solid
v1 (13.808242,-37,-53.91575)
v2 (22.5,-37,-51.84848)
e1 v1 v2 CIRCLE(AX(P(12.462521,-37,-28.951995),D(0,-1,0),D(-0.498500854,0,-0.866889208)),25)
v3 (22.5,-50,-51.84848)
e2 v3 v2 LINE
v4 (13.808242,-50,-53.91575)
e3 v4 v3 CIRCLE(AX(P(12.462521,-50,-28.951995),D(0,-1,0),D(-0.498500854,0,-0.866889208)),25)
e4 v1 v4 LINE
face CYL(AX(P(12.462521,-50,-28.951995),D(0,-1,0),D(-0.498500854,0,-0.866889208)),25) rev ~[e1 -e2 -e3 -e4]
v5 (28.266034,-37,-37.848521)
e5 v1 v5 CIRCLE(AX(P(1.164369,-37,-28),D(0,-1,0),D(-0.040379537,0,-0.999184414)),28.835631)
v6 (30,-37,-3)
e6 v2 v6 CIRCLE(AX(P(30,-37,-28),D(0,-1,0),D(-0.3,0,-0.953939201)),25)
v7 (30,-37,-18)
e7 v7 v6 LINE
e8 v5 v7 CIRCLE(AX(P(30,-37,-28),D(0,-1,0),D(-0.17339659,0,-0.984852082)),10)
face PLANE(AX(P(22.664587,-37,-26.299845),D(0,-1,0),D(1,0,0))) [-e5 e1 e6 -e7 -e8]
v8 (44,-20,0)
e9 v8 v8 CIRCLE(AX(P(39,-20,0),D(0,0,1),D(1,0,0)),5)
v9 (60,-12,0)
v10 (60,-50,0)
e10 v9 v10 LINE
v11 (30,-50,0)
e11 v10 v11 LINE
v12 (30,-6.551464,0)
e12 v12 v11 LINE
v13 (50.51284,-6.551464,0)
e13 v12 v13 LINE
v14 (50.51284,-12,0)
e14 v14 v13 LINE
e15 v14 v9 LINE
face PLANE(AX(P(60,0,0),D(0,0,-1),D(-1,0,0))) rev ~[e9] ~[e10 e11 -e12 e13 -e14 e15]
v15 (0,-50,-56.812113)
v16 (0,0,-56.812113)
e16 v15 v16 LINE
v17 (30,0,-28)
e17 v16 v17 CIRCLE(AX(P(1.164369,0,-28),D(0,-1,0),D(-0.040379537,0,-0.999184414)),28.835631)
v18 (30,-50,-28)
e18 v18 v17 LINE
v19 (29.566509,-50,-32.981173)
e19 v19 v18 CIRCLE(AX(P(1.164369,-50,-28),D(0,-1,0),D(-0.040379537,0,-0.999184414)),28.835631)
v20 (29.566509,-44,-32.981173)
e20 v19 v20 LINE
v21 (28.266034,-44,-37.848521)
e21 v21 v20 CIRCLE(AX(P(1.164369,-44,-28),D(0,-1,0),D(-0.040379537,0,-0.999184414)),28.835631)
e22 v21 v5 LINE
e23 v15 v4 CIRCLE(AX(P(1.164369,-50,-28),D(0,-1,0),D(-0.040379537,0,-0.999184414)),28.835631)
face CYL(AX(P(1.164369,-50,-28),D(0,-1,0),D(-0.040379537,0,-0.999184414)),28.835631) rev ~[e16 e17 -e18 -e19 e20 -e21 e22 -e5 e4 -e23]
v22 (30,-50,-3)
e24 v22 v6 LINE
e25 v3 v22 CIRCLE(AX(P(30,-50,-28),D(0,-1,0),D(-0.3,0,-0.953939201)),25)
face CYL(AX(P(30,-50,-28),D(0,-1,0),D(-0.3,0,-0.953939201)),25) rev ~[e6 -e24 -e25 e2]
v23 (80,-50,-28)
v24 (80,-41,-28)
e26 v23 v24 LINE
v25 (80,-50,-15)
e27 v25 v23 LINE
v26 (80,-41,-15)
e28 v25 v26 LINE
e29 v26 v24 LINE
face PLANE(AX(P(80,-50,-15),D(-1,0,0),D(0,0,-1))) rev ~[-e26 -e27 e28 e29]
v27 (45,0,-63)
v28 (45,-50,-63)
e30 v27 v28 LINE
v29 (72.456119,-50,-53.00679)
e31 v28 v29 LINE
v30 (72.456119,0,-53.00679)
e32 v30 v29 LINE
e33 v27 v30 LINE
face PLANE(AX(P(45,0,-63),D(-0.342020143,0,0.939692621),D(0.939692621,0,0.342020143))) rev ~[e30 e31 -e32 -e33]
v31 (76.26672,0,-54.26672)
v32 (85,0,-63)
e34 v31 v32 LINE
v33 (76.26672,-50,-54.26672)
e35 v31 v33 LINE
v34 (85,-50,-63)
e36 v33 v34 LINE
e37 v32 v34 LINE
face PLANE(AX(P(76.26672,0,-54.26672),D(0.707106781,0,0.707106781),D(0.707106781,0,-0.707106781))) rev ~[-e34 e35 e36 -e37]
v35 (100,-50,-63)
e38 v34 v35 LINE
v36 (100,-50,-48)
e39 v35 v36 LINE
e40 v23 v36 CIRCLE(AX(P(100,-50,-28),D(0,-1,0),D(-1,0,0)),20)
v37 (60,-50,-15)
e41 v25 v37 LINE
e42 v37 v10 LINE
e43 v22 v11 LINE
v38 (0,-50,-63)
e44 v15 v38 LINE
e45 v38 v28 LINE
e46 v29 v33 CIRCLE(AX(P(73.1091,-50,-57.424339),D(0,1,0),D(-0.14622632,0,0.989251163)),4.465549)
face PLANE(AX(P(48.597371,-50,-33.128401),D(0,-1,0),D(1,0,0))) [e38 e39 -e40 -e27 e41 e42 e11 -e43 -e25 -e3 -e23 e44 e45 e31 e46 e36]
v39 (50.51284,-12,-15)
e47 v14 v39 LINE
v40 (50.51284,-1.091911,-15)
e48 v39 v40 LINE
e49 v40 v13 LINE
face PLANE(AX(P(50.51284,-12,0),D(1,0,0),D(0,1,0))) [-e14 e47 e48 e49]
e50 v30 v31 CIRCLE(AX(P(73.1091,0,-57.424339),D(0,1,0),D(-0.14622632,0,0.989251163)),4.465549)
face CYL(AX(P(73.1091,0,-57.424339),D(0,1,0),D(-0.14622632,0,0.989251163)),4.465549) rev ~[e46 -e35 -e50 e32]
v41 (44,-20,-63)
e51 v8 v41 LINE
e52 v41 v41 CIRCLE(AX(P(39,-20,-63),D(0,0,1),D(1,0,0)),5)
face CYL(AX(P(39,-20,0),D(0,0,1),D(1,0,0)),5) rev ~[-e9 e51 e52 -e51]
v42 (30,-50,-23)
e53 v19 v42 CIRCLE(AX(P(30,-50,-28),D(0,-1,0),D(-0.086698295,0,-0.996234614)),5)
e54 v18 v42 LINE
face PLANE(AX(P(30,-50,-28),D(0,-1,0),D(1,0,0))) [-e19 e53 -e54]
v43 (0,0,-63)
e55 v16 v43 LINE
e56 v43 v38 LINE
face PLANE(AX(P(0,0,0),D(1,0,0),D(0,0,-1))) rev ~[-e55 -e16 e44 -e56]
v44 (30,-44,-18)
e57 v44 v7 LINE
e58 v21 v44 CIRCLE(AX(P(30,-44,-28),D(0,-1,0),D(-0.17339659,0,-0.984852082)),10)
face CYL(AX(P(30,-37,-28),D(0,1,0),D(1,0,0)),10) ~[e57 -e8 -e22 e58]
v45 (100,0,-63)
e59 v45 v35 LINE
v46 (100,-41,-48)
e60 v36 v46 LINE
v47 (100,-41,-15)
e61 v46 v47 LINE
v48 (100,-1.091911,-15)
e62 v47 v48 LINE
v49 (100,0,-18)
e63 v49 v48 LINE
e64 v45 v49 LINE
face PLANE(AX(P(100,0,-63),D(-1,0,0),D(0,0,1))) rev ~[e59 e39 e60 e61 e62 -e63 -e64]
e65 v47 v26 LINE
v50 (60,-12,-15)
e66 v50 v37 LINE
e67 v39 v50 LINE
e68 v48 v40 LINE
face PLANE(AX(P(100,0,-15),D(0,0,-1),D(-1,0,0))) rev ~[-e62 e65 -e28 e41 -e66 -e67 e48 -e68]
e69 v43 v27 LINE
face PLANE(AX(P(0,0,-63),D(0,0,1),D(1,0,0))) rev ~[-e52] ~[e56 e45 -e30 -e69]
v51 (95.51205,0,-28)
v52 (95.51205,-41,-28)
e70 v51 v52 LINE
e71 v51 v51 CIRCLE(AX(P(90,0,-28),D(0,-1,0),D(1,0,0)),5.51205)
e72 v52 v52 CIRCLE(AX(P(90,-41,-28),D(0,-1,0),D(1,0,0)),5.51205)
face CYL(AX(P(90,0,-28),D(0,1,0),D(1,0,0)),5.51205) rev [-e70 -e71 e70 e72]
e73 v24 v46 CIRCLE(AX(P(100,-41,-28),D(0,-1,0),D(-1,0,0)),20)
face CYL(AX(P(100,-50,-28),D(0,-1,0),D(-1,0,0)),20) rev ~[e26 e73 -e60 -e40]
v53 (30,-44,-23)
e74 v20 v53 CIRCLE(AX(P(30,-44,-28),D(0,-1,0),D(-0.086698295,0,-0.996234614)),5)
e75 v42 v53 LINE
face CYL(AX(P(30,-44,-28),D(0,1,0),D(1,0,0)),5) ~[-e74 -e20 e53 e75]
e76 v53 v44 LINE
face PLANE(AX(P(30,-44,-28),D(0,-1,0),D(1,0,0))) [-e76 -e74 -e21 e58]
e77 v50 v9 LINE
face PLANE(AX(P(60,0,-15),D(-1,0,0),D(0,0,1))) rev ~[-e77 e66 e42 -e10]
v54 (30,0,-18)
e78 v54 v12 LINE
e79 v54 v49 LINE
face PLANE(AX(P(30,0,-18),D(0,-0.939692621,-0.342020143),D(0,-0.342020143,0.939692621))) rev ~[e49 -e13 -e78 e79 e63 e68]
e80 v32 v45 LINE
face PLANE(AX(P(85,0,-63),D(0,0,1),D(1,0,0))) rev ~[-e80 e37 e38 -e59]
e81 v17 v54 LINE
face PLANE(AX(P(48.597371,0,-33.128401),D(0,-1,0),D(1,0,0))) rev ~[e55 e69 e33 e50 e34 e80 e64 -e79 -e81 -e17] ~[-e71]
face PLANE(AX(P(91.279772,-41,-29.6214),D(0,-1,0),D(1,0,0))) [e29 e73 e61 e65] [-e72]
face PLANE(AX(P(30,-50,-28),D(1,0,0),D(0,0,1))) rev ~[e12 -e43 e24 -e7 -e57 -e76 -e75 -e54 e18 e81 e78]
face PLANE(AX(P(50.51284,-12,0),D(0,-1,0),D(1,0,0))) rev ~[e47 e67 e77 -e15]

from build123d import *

# Parameters (mm, degrees)
F0_R      = 5.5120501068
F1_DEPTH  = 50
F3_DEPTH  = 13
F4_R      = 10
F5_DEPTH  = 7
F6_R      = 5
F7_DEPTH  = 6
F8_R      = 5.5120501068
F9_DEPTH  = 9
F11_DEPTH = 381
F13_DEPTH = 381
F14_W     = 50
F14_H     = 12
F15_DEPTH = 15
F16_R     = 5
F17_DEPTH = 381


with BuildPart() as f1:
    # F0 (on Front) → F1 (new body)
    with BuildSketch(Plane.XZ):
        with BuildLine():
            Line((60, -15), (60, 0))
            Line((60, 0), (0, 0))
            Line((0, 0), (0, -63))
            Line((0, -63), (45, -63))
            Line((45, -63), (72.4561188247, -53.0067899993))
            ThreePointArc((72.4561188247, -53.0067899993), (74.5109412295, -53.1845320084), (76.2667195414, -54.2667195414))
            Line((76.2667195414, -54.2667195414), (85, -63))
            Line((85, -63), (100, -63))
            Line((100, -63), (100, -15))
            Line((100, -15), (60, -15))
        make_face()
        with Locations((90, -28)):
            Circle(F0_R, mode=Mode.SUBTRACT)
    extrude(amount=F1_DEPTH)

    # F2 (on face) → F3 (cut)
    with BuildSketch(Plane.XZ.offset(50)):
        with BuildLine():
            Line((30, 0), (0, 0))
            Line((0, 0), (0, -50.6242252886))
            ThreePointArc((0, -50.6242252886), (11.1042474662, -53.9150696691), (22.5, -51.8484800354))
            ThreePointArc((22.5, -51.8484800354), (54.7104431454, -31.7939424821), (30, -3))
            Line((30, -3), (30, 0))
        make_face()
    extrude(amount=-F3_DEPTH, mode=Mode.SUBTRACT)

    # F4 (on face) → F5 (join)
    with BuildSketch(Plane.XZ.offset(37)):
        with Locations((30, -28)):
            Circle(F4_R)
    extrude(amount=F5_DEPTH)

    # F6 (on face) → F7 (join)
    with BuildSketch(Plane.XZ.offset(44)):
        with Locations((30, -28)):
            Circle(F6_R)
    extrude(amount=F7_DEPTH)

    # F8 (on face) → F9 (cut)
    with BuildSketch(Plane.XZ.offset(50)):
        with BuildLine():
            Line((100, -15), (80, -15))
            Line((80, -15), (80, -28))
            ThreePointArc((80, -28), (85.8578643763, -42.1421356237), (100, -48))
            Line((100, -48), (100, -15))
        make_face()
        with Locations((90, -28)):
            Circle(F8_R, mode=Mode.SUBTRACT)
    extrude(amount=-F9_DEPTH, mode=Mode.SUBTRACT)

    # F10 (on face) → F11 (cut)
    with BuildSketch(Plane.XZ.offset(50)):
        with BuildLine():
            Line((30, 0), (0, 0))
            Line((0, 0), (0, -56.8121126443))
            ThreePointArc((0, -56.8121126443), (21.1383307761, -48.7974627961), (30, -28))
            Line((30, -28), (30, 0))
        make_face()
    extrude(amount=-F11_DEPTH, mode=Mode.SUBTRACT)

    # F12 (on face) → F13 (cut)
    with BuildSketch(Plane(origin=(30, 0, 0), x_dir=(0, -1, 0), z_dir=(-1, 0, 0))):
        Polygon((6.5514642168, 0), (0, 0), (0, -18), align=None)
    extrude(amount=-F13_DEPTH, mode=Mode.SUBTRACT)

    # F14 (on Top) → F15 (cut)
    with BuildSketch(Plane.XY):
        with Locations((75.5128398538, -6)):
            Rectangle(F14_W, F14_H)
    extrude(amount=-F15_DEPTH, mode=Mode.SUBTRACT)

    # F16 (on face) → F17 (cut)
    with BuildSketch(Plane.XY):
        with Locations((39, -20)):
            Circle(F16_R)
    extrude(amount=-F17_DEPTH, mode=Mode.SUBTRACT)


solid = f1.part
